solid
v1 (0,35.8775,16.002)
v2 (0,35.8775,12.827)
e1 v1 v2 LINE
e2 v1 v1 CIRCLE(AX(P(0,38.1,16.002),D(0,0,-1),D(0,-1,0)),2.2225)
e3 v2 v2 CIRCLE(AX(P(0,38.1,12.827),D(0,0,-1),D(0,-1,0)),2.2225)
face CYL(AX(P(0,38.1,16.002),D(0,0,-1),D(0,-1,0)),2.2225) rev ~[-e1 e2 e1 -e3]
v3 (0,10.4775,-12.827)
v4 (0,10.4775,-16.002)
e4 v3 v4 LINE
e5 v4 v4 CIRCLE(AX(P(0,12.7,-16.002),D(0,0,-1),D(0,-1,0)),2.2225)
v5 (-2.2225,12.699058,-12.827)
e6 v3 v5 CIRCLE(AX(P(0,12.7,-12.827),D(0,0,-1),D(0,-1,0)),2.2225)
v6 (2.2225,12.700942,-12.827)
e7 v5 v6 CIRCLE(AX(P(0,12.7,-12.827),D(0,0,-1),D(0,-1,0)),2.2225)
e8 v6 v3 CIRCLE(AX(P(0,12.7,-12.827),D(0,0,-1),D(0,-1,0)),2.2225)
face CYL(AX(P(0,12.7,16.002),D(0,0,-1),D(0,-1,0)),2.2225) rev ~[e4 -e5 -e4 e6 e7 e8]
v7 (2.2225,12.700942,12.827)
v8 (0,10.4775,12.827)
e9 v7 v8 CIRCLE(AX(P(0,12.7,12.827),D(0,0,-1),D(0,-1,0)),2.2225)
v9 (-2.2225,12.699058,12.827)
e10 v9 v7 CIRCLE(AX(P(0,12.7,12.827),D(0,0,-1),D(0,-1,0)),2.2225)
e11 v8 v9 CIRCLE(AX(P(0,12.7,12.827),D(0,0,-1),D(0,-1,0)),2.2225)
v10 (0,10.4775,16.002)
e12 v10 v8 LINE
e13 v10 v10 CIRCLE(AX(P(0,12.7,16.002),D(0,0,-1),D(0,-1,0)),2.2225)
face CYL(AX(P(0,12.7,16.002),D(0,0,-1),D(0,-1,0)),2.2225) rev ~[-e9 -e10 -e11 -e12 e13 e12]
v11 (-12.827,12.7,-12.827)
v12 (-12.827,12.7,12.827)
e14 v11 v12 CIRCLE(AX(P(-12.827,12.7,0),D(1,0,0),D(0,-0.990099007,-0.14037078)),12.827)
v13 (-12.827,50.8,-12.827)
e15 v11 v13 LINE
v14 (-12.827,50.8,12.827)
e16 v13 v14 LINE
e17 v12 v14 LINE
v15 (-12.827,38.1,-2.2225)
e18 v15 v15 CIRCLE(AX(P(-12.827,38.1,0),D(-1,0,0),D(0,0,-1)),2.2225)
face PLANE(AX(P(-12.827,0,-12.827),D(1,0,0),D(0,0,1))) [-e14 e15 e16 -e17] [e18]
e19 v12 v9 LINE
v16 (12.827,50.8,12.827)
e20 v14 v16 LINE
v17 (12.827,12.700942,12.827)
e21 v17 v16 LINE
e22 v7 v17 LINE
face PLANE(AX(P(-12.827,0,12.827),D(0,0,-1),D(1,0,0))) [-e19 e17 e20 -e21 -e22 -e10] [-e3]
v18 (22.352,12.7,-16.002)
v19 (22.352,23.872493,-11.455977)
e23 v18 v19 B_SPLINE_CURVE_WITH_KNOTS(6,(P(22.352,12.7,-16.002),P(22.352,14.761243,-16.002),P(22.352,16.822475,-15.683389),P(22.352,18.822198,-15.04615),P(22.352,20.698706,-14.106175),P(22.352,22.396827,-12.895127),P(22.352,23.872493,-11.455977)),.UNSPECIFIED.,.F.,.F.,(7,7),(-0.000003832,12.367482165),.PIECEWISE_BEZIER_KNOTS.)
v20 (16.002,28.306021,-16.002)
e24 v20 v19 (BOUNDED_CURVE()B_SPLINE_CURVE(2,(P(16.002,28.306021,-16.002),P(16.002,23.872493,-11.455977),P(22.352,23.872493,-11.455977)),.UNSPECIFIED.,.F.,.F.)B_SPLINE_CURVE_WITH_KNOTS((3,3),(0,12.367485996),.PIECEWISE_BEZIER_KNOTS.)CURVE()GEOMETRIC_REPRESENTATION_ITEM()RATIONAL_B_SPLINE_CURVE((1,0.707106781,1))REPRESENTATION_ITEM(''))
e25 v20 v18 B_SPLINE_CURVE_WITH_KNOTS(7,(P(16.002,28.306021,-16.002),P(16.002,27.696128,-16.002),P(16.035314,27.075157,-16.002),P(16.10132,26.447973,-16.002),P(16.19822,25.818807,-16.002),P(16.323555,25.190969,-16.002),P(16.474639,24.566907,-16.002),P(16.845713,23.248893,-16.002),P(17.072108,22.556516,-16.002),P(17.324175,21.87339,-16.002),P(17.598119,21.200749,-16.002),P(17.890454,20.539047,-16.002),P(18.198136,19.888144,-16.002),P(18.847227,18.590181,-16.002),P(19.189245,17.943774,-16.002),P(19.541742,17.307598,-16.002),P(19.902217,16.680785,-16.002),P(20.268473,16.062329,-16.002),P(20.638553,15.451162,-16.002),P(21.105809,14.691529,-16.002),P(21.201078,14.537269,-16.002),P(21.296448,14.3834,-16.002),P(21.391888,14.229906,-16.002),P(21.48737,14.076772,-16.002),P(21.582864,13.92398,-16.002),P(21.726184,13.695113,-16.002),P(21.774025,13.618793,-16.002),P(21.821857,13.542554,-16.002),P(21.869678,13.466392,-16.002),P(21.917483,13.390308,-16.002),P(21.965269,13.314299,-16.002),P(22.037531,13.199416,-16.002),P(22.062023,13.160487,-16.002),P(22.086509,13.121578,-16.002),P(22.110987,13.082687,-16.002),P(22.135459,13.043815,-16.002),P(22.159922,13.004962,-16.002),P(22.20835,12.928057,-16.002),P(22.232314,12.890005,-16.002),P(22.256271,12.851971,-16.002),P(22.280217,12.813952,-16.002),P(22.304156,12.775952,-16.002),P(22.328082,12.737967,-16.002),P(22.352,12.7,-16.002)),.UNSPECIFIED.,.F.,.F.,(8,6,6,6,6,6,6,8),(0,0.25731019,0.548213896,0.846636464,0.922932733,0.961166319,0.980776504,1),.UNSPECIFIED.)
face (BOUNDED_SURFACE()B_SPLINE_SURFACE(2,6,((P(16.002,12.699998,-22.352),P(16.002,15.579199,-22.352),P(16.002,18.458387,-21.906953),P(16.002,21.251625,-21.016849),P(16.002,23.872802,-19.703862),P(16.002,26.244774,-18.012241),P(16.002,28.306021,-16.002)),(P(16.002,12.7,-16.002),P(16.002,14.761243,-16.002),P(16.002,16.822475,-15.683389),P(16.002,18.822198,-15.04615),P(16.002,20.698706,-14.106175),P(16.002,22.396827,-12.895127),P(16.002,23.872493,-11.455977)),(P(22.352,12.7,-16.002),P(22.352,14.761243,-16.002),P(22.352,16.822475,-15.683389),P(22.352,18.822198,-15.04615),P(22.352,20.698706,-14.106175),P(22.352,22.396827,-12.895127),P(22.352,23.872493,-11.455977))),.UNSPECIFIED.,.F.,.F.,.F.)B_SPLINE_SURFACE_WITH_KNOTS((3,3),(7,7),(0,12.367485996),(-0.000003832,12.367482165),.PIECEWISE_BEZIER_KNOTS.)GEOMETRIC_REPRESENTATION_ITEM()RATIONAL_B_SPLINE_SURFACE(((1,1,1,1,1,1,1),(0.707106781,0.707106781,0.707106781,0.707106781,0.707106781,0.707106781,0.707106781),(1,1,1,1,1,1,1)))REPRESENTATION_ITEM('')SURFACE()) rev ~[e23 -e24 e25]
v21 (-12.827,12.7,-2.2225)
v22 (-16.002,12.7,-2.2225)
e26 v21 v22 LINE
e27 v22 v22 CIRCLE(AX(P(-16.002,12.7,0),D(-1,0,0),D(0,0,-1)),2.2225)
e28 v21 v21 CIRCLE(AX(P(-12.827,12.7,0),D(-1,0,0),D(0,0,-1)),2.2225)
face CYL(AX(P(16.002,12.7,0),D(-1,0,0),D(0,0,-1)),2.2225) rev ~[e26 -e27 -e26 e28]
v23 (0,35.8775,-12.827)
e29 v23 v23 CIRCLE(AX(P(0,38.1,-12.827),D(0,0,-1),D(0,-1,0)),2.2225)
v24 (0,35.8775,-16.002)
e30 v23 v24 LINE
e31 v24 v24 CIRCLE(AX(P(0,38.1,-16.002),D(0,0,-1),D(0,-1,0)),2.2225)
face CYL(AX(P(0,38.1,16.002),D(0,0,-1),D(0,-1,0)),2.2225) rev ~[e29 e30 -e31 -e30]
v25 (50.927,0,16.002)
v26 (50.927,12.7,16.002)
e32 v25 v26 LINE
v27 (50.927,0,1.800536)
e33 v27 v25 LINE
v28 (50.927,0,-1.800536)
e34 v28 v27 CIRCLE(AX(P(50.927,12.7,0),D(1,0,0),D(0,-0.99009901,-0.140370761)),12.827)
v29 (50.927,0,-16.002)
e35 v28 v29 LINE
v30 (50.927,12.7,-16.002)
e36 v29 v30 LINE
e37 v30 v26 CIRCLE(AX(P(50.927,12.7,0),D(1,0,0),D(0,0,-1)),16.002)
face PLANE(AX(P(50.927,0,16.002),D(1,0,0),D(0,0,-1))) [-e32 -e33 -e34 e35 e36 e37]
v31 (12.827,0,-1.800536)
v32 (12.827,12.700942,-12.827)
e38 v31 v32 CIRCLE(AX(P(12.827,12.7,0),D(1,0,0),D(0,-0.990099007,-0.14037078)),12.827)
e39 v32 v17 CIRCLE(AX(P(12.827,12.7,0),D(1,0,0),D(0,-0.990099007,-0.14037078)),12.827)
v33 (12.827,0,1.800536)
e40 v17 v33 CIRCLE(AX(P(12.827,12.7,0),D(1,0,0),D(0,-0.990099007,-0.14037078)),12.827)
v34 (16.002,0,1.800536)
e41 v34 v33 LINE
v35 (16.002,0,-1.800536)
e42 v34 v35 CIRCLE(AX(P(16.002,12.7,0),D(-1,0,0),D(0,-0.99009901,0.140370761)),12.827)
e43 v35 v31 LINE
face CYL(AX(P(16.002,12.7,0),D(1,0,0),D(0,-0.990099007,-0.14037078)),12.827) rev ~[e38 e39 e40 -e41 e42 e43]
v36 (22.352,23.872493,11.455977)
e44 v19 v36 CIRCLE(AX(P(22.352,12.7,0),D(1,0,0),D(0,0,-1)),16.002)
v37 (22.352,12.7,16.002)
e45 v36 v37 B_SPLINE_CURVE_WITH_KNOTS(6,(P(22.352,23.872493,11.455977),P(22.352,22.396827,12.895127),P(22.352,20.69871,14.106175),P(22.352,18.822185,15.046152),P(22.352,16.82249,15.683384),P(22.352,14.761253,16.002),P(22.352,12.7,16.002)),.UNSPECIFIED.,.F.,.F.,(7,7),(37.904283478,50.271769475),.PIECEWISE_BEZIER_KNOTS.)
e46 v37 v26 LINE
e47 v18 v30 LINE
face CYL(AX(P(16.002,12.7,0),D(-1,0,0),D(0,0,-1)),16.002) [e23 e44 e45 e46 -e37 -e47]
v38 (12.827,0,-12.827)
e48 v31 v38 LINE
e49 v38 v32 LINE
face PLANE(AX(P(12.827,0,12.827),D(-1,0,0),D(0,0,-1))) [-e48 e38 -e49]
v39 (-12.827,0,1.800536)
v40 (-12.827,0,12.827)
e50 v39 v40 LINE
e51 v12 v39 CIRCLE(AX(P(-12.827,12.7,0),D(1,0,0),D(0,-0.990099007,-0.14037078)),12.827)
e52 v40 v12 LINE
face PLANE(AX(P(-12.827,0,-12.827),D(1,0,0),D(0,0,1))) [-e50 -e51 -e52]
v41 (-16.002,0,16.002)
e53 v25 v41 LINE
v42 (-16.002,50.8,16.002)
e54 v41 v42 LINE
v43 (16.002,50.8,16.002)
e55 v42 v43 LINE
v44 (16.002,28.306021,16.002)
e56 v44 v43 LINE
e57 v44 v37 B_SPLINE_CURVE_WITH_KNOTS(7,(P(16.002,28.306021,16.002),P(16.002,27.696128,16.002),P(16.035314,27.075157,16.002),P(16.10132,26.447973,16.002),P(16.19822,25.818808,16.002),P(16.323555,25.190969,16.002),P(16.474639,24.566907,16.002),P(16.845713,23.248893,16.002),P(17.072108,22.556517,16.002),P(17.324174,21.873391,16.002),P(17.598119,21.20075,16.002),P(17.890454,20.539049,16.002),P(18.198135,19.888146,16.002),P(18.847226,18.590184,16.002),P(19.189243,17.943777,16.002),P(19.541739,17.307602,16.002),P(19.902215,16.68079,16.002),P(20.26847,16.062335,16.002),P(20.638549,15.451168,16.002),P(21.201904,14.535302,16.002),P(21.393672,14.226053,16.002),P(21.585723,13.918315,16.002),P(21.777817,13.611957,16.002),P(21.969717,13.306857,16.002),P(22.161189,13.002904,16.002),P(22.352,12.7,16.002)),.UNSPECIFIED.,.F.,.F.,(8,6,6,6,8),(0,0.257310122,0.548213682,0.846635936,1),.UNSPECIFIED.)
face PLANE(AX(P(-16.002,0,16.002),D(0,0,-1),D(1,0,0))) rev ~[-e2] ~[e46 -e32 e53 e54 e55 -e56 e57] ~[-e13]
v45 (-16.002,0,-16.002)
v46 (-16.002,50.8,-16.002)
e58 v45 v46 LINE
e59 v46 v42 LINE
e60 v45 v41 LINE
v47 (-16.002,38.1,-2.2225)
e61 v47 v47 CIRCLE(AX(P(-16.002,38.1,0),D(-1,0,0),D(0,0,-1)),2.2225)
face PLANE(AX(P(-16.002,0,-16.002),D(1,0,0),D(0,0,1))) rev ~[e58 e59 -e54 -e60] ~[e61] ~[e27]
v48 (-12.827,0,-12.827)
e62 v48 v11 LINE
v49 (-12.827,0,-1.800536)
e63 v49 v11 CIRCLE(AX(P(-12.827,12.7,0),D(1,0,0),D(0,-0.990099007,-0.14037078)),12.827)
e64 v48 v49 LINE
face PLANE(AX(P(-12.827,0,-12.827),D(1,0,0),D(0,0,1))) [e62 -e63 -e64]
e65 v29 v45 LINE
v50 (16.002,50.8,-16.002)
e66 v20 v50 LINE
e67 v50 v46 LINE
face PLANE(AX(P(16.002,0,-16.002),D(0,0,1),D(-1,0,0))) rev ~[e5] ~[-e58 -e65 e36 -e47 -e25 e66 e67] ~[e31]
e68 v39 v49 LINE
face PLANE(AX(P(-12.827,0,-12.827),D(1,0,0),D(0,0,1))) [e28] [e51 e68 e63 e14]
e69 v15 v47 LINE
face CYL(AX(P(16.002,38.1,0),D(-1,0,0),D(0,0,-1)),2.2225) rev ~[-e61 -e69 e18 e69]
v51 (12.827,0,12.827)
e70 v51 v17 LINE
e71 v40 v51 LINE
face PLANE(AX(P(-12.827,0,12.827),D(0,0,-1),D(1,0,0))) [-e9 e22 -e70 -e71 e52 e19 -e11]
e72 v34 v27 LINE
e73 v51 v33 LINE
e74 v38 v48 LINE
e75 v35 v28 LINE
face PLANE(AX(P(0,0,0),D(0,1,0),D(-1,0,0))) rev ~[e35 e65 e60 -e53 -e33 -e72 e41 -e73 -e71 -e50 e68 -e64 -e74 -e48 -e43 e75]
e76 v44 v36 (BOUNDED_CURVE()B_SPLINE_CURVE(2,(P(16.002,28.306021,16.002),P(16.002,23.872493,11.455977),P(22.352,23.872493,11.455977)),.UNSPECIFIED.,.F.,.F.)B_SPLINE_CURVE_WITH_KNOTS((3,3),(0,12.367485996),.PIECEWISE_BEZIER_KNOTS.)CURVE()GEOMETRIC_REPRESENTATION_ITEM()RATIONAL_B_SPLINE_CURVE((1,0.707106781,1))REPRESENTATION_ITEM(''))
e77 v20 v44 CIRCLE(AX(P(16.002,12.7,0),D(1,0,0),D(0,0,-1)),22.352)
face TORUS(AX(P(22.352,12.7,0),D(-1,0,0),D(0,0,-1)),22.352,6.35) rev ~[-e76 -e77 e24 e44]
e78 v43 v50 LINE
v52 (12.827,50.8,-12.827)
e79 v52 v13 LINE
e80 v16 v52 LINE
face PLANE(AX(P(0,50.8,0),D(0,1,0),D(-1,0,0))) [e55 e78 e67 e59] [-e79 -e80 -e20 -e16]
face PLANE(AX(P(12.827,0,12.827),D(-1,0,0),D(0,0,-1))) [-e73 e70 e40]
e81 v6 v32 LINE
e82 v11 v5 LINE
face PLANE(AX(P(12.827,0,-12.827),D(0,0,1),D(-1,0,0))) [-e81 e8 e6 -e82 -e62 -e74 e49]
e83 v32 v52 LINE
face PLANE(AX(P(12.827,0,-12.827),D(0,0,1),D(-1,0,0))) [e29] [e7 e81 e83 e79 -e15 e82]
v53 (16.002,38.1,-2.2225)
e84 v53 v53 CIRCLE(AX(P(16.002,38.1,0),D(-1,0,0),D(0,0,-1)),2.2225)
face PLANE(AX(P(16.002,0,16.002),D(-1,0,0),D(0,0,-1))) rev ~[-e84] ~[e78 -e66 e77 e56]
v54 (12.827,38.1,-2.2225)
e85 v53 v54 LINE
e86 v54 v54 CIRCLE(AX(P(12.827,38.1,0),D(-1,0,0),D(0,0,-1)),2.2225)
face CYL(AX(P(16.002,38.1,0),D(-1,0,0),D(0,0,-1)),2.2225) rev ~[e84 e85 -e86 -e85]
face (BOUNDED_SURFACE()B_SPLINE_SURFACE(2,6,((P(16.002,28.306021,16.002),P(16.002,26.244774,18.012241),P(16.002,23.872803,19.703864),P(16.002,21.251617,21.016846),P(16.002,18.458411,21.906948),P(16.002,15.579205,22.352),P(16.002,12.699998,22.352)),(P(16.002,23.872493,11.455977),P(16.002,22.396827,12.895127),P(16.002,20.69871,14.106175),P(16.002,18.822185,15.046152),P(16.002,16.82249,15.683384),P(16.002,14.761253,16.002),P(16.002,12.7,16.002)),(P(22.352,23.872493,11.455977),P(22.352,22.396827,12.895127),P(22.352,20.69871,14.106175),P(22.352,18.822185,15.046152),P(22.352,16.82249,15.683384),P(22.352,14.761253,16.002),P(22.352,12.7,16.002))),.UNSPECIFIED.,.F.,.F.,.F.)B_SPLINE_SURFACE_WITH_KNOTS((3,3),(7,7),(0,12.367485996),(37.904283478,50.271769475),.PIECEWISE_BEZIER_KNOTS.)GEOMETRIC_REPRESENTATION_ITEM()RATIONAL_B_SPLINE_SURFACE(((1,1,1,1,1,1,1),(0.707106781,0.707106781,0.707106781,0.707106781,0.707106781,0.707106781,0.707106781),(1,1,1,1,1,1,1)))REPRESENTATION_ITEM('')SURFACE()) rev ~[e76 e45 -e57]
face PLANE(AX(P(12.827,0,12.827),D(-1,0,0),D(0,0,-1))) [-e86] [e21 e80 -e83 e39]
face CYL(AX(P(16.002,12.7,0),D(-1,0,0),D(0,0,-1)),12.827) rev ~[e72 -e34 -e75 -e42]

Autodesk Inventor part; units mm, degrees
ref_plane "YZ Plane" through (0, 0, 0) normal (1, 0, 0) x (0, 1, 0)
ref_plane "XZ Plane" through (0, 0, 0) normal (0, 1, 0) x (-1, 0, 0)
ref_plane "XY Plane" through (0, 0, 0) normal (0, 0, 1) x (1, 0, 0)
sketch "Sketch1" plane through (0, 0, 0) normal (0, 1, 0) x (-1, 0, 0)
  line L0 (12.827, 12.827) -> (-12.827, 12.827)
  line L1 (-12.827, 12.827) -> (-12.827, -12.827)
  line L2 (-12.827, -12.827) -> (12.827, -12.827)
  line L3 (12.827, -12.827) -> (12.827, 12.827)
  line L4 (12.827, 12.827) -> (-12.827, -12.827) construction
  line L5 (-12.827, 12.827) -> (12.827, -12.827) construction
  line L6 (16.002, 16.002) -> (-16.002, 16.002)
  line L7 (-16.002, 16.002) -> (-16.002, -16.002)
  line L8 (-16.002, -16.002) -> (16.002, -16.002)
  line L9 (16.002, -16.002) -> (16.002, 16.002)
  point P0 (0, 0)
  dimension "d0" = 25.654
  dimension "d1" = 25.654
  dimension "d2" = 3.175
extrude "Extrusion1" add sketch "Sketch1" along normal blind 50.8
sketch "Sketch2" plane through (16.002, 0, 16.002) normal (1, 0, 0) x (0, 0, -1)
  line L0 (0, 50.8) -> (32.004, 50.8) projected
  point P0 (16.002, 0)
  point P1 (16.002, 12.7)
  point P2 (16.002, 38.1)
  point P3 (16.002, 50.8)
  dimension "d5" = 12.7
  dimension "d6" = 25.4
hole "Hole1" at (16.002, 12.7, 0) at (16.002, 38.1, 0) direction (-1, 0, 0) diameter 4.445 end through all
sketch "Sketch3" plane through (-16.002, 0, 16.002) normal (0, 0, 1) x (1, 0, 0)
  line L0 (0, 50.8) -> (32.004, 50.8) projected
  point P0 (16.002, 0)
  point P1 (16.002, 12.7)
  point P2 (16.002, 38.1)
  point P3 (32.004, 38.1)
  point P4 (32.004, 12.7)
  point P5 (16.002, 50.8)
hole "Hole2" at (0, 38.1, 16.002) at (0, 12.7, 16.002) direction (0, 0, -1) diameter 4.445 end through all
sketch "Sketch4" plane through (16.002, 0, 16.002) normal (1, 0, 0) x (0, 0, -1)
  circle A0 centre (16.002, 12.7) radius 2.2225 projected
  circle A1 centre (16.002, 12.7) radius 12.7
  circle A2 centre (16.002, 12.7) radius 16.002
  line L0 (32.004, 0) -> (32.004, 50.8) projected
  line L1 (0, 0) -> (32.004, 0) projected
  line L2 (0, 0) -> (0, 50.8) projected
  circle A3 centre (16.002, 12.7) radius 2.2225 projected
  circle A4 centre (16.002, 12.7) radius 12.827
  point P0 (16.002, 0)
  point P1 (0, 12.7)
  point P2 (32.004, 12.7)
  point P3 (14.201464, 0)
  point P4 (17.802536, 0)
  dimension "d26" = 25.4
  dimension "d27" = 25.654
extrude "Extrusion2" add sketch "Sketch4" along normal blind 34.925 contours L1 A2 A4 | L1 L2 A2 | A2 L0 L1 picked at (30.667502, 14.995372)
sketch "Sketch4 outline for Extrusion3" plane through (16.002, 0, 16.002) normal (1, 0, 0) x (0, 0, -1)
  circle A0 centre (16.002, 12.7) radius 2.2225
  arc A1 (17.802536, 0) -> (14.201464, 0) centre (16.002, 12.7) ccw
  line L0 (14.201464, 0) -> (17.802536, 0)
extrude "Extrusion3" cut sketch "Sketch4 outline for Extrusion3" against normal up to surface (28.829 mm away)
fillet "Fillet1" radius 6.35 1 edges at (16.002, 28.702, 0)
properties part number "Tracking Wheel Guide"
